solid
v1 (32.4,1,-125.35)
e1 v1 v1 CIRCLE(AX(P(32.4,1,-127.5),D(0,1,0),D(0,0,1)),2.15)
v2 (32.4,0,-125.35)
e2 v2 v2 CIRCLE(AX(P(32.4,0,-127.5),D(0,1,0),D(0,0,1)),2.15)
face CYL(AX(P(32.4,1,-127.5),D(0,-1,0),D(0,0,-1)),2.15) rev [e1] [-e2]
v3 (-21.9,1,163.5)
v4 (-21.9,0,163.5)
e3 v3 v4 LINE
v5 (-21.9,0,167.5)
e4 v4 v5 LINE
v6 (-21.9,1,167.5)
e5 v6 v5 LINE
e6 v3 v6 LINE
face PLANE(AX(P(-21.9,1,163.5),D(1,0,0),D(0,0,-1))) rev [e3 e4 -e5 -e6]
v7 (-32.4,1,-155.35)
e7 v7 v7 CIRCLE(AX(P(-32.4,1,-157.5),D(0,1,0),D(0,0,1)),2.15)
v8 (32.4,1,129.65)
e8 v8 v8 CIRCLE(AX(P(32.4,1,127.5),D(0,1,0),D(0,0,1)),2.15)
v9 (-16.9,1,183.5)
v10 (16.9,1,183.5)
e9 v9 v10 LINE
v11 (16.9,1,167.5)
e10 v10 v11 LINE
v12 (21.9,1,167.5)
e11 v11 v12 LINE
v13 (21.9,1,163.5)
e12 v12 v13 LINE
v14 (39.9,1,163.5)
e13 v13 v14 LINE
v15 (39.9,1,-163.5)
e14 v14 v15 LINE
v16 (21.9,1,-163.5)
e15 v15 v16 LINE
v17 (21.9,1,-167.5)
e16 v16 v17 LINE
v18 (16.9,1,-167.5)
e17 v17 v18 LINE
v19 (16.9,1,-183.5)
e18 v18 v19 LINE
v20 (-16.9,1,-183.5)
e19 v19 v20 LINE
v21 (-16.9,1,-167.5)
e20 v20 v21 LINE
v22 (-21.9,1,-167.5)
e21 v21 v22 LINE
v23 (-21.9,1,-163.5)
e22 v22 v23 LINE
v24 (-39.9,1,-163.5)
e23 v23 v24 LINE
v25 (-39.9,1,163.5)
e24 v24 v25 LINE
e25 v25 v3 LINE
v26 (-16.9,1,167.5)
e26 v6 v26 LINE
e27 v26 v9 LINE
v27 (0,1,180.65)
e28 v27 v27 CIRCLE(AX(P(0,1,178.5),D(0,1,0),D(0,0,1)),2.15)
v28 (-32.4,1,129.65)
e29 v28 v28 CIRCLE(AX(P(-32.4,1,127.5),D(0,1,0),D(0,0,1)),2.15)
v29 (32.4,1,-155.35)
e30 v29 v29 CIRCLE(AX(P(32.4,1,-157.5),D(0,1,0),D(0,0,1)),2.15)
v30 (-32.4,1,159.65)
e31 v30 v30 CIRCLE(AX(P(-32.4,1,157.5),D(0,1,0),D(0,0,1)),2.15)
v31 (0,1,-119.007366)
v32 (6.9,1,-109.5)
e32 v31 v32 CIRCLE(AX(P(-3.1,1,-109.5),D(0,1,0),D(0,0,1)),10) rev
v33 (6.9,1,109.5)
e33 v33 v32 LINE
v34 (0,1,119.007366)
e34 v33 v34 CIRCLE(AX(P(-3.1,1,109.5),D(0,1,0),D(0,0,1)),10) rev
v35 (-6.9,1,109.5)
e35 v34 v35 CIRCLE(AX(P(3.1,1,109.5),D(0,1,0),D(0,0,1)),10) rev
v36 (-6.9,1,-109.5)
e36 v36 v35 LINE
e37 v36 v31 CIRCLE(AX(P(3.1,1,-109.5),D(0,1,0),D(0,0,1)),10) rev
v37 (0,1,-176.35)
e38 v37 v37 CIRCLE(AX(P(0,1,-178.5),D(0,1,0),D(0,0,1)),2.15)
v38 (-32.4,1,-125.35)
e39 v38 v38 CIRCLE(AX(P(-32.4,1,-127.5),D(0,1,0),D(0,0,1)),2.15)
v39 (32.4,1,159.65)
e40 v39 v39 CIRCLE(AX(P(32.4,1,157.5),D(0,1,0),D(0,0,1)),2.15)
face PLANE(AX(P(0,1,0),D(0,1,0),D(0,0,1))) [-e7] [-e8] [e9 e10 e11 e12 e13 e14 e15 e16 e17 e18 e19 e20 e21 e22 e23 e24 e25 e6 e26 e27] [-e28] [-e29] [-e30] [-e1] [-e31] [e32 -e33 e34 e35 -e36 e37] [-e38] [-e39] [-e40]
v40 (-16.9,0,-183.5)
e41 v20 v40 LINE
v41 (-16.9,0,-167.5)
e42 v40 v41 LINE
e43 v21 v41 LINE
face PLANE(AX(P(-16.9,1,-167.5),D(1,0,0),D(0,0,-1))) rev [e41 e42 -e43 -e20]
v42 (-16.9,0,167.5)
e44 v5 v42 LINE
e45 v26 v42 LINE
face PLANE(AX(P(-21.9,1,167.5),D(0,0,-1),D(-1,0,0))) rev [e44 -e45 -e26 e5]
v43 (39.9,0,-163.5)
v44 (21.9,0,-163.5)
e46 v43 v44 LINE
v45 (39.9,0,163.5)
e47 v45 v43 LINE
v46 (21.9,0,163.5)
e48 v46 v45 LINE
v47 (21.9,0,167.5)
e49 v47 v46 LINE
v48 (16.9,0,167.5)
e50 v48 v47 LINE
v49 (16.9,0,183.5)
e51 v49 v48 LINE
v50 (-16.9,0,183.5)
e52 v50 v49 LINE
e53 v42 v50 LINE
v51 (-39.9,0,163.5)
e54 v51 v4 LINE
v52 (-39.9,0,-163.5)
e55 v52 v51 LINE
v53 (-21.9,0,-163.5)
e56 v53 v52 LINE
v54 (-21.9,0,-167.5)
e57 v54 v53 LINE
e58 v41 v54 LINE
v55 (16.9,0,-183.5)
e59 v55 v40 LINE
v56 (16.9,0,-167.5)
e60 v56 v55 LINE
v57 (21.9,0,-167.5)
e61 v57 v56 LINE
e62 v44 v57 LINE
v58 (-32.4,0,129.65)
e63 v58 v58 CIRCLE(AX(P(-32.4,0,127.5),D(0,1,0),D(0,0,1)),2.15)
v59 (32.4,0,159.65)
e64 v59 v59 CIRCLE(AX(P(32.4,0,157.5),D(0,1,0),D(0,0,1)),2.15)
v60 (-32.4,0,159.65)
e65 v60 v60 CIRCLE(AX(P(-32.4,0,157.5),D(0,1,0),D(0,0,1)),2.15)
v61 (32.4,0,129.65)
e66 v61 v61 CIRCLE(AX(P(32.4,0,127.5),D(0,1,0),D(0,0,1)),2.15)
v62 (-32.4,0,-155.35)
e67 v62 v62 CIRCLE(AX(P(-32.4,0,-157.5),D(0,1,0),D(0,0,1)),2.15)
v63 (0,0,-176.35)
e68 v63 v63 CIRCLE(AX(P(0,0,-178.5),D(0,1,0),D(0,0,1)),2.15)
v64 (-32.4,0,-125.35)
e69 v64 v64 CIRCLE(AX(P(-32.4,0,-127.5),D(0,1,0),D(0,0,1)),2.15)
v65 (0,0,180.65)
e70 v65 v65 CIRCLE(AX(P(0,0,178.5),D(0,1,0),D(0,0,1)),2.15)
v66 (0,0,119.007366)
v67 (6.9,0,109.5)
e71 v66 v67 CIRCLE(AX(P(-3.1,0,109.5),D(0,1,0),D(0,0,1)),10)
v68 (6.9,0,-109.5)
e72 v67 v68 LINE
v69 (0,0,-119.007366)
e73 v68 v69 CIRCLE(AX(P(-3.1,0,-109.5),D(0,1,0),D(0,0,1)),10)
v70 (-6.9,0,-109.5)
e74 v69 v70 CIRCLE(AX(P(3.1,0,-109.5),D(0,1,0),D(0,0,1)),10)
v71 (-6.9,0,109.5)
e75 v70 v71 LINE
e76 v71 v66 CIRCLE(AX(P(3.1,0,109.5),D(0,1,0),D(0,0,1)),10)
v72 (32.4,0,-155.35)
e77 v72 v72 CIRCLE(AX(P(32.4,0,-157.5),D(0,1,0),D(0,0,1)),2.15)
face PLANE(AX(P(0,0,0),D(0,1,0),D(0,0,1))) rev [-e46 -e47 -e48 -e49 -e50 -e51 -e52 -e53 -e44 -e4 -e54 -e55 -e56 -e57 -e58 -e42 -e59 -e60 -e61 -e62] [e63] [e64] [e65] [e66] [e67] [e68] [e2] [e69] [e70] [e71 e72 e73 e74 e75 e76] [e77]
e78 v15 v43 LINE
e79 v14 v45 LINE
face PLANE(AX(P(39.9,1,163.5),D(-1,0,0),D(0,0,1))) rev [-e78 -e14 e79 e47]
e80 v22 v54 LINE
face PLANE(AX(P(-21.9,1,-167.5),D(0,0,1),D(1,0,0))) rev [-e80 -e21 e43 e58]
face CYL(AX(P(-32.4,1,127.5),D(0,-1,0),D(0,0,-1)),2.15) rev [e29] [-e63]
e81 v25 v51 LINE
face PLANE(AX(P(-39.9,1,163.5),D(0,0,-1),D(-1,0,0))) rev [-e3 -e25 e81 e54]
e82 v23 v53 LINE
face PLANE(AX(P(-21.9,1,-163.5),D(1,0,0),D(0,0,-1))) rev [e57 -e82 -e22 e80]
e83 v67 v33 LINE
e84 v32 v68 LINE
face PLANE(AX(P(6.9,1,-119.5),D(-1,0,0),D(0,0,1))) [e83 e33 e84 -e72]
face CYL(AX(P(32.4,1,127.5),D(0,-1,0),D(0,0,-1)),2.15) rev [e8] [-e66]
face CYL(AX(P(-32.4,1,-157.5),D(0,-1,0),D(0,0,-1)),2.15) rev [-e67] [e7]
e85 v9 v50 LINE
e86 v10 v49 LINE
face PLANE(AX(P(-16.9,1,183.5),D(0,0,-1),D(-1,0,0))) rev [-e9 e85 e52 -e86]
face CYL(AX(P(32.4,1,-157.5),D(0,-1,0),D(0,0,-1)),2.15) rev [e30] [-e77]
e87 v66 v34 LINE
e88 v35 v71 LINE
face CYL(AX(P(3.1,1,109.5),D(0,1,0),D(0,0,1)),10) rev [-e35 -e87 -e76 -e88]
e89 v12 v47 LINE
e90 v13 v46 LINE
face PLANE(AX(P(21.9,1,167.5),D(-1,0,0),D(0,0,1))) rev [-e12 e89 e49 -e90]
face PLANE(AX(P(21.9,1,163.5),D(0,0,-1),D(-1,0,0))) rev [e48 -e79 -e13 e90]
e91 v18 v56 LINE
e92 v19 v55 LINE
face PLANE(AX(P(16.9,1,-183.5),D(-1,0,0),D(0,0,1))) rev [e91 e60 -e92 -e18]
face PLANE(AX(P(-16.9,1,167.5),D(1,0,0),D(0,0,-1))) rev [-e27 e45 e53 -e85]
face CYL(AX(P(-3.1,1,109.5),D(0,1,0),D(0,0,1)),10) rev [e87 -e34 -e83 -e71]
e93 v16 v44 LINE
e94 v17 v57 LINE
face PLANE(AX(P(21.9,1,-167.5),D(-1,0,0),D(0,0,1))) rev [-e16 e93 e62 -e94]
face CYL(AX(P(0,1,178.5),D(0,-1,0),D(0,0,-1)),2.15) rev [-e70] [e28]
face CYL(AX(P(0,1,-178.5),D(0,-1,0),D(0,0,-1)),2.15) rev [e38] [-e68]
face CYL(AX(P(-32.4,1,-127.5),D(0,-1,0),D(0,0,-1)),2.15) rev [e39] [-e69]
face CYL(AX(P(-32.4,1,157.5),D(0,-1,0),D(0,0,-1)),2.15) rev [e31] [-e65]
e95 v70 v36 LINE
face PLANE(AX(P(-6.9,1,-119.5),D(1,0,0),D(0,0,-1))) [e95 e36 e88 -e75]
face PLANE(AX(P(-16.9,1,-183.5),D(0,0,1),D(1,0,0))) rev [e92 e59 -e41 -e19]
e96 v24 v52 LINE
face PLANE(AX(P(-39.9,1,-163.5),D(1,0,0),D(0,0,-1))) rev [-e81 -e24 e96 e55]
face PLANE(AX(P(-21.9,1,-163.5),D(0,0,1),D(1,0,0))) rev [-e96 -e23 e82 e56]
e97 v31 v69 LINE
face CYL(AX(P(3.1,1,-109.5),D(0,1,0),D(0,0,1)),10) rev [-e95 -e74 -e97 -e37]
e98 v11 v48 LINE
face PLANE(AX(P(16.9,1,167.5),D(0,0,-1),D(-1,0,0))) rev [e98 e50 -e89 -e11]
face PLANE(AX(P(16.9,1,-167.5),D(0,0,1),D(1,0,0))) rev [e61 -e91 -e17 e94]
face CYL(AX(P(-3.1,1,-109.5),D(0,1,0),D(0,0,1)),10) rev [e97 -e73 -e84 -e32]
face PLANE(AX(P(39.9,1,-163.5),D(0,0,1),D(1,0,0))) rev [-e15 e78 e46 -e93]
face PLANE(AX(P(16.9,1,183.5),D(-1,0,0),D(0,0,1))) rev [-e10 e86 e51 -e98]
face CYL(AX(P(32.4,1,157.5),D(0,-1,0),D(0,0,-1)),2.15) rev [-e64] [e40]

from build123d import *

# Parameters (mm, degrees)
SKETCH1_R           = 2.15
SKETCH1_W           = 13.8
SKETCH1_H           = 239
BOSS_EXTRUDE1_DEPTH = 1
FILLET2_R           = 10


with BuildPart() as part:
    # Sketch1 → Boss-Extrude1 (new body)
    with BuildSketch(Plane(origin=(0, 0, 0), x_dir=(1, 0, 0), z_dir=(0, 1, 0))):
        Polygon((-39.9, -163.5), (-21.9, -163.5), (-21.9, -167.5), (-16.9, -167.5), (-16.9, -183.5), (16.9, -183.5), (16.9, -167.5), (21.9, -167.5), (21.9, -163.5), (39.9, -163.5), (39.9, 163.5), (21.9, 163.5), (21.9, 167.5), (16.9, 167.5), (16.9, 183.5), (-16.9, 183.5), (-16.9, 167.5), (-21.9, 167.5), (-21.9, 163.5), (-39.9, 163.5), align=None)
        with Locations(Location((-32.4, 127.5, 0), (0, 0, 270))):
            Circle(SKETCH1_R, mode=Mode.SUBTRACT)
        with Locations(Location((32.4, 127.5, 0), (0, 0, 270))):
            Circle(SKETCH1_R, mode=Mode.SUBTRACT)
        with Locations(Location((-32.4, -127.5, 0), (0, 0, 270))):
            Circle(SKETCH1_R, mode=Mode.SUBTRACT)
        with Locations(Location((32.4, -127.5, 0), (0, 0, 270))):
            Circle(SKETCH1_R, mode=Mode.SUBTRACT)
        with Locations(Location((-32.4, -157.5, 0), (0, 0, 270))):
            Circle(SKETCH1_R, mode=Mode.SUBTRACT)
        with Locations(Location((32.4, -157.5, 0), (0, 0, 270))):
            Circle(SKETCH1_R, mode=Mode.SUBTRACT)
        with Locations(Location((32.4, 157.5, 0), (0, 0, 270))):
            Circle(SKETCH1_R, mode=Mode.SUBTRACT)
        with Locations(Location((-32.4, 157.5, 0), (0, 0, 270))):
            Circle(SKETCH1_R, mode=Mode.SUBTRACT)
        with Locations(Location((0, 178.5, 0), (0, 0, 270))):
            Circle(SKETCH1_R, mode=Mode.SUBTRACT)
        with Locations(Location((0, -178.5, 0), (0, 0, 270))):
            Circle(SKETCH1_R, mode=Mode.SUBTRACT)
        Rectangle(SKETCH1_W, SKETCH1_H, mode=Mode.SUBTRACT)
    extrude(amount=BOSS_EXTRUDE1_DEPTH)

    # Fillet2
    # the kernel refuses this fillet: 10 mm, written as the material it adds along each edge
    with BuildSketch(Plane(origin=(6.9, 0, -119.5), x_dir=(-1, 0, 0), z_dir=(0, 1, 0)), Plane(origin=(6.9, 0, 119.5), x_dir=(0, 0, -1), z_dir=(0, 1, 0)), Plane(origin=(-6.9, 0, 119.5), x_dir=(1, 0, 0), z_dir=(0, 1, 0))) as fillet2_piece_1:
        with BuildLine():
            CenterArc((FILLET2_R, FILLET2_R), FILLET2_R, 180, 90)
            Line((0, FILLET2_R), (0, 0))
            Line((0, 0), (FILLET2_R, 0))
        make_face()
    extrude(amount=1)
    with BuildSketch(Plane(origin=(-6.9, 0, -119.5), x_dir=(1, 0, 0), z_dir=(0, 1, 0))) as fillet2_piece_2:
        with BuildLine():
            CenterArc((FILLET2_R, -FILLET2_R), FILLET2_R, 90, 90)
            Line((0, -FILLET2_R), (0, 0))
            Line((0, 0), (FILLET2_R, 0))
        make_face()
    extrude(amount=1)


solid = part.part
